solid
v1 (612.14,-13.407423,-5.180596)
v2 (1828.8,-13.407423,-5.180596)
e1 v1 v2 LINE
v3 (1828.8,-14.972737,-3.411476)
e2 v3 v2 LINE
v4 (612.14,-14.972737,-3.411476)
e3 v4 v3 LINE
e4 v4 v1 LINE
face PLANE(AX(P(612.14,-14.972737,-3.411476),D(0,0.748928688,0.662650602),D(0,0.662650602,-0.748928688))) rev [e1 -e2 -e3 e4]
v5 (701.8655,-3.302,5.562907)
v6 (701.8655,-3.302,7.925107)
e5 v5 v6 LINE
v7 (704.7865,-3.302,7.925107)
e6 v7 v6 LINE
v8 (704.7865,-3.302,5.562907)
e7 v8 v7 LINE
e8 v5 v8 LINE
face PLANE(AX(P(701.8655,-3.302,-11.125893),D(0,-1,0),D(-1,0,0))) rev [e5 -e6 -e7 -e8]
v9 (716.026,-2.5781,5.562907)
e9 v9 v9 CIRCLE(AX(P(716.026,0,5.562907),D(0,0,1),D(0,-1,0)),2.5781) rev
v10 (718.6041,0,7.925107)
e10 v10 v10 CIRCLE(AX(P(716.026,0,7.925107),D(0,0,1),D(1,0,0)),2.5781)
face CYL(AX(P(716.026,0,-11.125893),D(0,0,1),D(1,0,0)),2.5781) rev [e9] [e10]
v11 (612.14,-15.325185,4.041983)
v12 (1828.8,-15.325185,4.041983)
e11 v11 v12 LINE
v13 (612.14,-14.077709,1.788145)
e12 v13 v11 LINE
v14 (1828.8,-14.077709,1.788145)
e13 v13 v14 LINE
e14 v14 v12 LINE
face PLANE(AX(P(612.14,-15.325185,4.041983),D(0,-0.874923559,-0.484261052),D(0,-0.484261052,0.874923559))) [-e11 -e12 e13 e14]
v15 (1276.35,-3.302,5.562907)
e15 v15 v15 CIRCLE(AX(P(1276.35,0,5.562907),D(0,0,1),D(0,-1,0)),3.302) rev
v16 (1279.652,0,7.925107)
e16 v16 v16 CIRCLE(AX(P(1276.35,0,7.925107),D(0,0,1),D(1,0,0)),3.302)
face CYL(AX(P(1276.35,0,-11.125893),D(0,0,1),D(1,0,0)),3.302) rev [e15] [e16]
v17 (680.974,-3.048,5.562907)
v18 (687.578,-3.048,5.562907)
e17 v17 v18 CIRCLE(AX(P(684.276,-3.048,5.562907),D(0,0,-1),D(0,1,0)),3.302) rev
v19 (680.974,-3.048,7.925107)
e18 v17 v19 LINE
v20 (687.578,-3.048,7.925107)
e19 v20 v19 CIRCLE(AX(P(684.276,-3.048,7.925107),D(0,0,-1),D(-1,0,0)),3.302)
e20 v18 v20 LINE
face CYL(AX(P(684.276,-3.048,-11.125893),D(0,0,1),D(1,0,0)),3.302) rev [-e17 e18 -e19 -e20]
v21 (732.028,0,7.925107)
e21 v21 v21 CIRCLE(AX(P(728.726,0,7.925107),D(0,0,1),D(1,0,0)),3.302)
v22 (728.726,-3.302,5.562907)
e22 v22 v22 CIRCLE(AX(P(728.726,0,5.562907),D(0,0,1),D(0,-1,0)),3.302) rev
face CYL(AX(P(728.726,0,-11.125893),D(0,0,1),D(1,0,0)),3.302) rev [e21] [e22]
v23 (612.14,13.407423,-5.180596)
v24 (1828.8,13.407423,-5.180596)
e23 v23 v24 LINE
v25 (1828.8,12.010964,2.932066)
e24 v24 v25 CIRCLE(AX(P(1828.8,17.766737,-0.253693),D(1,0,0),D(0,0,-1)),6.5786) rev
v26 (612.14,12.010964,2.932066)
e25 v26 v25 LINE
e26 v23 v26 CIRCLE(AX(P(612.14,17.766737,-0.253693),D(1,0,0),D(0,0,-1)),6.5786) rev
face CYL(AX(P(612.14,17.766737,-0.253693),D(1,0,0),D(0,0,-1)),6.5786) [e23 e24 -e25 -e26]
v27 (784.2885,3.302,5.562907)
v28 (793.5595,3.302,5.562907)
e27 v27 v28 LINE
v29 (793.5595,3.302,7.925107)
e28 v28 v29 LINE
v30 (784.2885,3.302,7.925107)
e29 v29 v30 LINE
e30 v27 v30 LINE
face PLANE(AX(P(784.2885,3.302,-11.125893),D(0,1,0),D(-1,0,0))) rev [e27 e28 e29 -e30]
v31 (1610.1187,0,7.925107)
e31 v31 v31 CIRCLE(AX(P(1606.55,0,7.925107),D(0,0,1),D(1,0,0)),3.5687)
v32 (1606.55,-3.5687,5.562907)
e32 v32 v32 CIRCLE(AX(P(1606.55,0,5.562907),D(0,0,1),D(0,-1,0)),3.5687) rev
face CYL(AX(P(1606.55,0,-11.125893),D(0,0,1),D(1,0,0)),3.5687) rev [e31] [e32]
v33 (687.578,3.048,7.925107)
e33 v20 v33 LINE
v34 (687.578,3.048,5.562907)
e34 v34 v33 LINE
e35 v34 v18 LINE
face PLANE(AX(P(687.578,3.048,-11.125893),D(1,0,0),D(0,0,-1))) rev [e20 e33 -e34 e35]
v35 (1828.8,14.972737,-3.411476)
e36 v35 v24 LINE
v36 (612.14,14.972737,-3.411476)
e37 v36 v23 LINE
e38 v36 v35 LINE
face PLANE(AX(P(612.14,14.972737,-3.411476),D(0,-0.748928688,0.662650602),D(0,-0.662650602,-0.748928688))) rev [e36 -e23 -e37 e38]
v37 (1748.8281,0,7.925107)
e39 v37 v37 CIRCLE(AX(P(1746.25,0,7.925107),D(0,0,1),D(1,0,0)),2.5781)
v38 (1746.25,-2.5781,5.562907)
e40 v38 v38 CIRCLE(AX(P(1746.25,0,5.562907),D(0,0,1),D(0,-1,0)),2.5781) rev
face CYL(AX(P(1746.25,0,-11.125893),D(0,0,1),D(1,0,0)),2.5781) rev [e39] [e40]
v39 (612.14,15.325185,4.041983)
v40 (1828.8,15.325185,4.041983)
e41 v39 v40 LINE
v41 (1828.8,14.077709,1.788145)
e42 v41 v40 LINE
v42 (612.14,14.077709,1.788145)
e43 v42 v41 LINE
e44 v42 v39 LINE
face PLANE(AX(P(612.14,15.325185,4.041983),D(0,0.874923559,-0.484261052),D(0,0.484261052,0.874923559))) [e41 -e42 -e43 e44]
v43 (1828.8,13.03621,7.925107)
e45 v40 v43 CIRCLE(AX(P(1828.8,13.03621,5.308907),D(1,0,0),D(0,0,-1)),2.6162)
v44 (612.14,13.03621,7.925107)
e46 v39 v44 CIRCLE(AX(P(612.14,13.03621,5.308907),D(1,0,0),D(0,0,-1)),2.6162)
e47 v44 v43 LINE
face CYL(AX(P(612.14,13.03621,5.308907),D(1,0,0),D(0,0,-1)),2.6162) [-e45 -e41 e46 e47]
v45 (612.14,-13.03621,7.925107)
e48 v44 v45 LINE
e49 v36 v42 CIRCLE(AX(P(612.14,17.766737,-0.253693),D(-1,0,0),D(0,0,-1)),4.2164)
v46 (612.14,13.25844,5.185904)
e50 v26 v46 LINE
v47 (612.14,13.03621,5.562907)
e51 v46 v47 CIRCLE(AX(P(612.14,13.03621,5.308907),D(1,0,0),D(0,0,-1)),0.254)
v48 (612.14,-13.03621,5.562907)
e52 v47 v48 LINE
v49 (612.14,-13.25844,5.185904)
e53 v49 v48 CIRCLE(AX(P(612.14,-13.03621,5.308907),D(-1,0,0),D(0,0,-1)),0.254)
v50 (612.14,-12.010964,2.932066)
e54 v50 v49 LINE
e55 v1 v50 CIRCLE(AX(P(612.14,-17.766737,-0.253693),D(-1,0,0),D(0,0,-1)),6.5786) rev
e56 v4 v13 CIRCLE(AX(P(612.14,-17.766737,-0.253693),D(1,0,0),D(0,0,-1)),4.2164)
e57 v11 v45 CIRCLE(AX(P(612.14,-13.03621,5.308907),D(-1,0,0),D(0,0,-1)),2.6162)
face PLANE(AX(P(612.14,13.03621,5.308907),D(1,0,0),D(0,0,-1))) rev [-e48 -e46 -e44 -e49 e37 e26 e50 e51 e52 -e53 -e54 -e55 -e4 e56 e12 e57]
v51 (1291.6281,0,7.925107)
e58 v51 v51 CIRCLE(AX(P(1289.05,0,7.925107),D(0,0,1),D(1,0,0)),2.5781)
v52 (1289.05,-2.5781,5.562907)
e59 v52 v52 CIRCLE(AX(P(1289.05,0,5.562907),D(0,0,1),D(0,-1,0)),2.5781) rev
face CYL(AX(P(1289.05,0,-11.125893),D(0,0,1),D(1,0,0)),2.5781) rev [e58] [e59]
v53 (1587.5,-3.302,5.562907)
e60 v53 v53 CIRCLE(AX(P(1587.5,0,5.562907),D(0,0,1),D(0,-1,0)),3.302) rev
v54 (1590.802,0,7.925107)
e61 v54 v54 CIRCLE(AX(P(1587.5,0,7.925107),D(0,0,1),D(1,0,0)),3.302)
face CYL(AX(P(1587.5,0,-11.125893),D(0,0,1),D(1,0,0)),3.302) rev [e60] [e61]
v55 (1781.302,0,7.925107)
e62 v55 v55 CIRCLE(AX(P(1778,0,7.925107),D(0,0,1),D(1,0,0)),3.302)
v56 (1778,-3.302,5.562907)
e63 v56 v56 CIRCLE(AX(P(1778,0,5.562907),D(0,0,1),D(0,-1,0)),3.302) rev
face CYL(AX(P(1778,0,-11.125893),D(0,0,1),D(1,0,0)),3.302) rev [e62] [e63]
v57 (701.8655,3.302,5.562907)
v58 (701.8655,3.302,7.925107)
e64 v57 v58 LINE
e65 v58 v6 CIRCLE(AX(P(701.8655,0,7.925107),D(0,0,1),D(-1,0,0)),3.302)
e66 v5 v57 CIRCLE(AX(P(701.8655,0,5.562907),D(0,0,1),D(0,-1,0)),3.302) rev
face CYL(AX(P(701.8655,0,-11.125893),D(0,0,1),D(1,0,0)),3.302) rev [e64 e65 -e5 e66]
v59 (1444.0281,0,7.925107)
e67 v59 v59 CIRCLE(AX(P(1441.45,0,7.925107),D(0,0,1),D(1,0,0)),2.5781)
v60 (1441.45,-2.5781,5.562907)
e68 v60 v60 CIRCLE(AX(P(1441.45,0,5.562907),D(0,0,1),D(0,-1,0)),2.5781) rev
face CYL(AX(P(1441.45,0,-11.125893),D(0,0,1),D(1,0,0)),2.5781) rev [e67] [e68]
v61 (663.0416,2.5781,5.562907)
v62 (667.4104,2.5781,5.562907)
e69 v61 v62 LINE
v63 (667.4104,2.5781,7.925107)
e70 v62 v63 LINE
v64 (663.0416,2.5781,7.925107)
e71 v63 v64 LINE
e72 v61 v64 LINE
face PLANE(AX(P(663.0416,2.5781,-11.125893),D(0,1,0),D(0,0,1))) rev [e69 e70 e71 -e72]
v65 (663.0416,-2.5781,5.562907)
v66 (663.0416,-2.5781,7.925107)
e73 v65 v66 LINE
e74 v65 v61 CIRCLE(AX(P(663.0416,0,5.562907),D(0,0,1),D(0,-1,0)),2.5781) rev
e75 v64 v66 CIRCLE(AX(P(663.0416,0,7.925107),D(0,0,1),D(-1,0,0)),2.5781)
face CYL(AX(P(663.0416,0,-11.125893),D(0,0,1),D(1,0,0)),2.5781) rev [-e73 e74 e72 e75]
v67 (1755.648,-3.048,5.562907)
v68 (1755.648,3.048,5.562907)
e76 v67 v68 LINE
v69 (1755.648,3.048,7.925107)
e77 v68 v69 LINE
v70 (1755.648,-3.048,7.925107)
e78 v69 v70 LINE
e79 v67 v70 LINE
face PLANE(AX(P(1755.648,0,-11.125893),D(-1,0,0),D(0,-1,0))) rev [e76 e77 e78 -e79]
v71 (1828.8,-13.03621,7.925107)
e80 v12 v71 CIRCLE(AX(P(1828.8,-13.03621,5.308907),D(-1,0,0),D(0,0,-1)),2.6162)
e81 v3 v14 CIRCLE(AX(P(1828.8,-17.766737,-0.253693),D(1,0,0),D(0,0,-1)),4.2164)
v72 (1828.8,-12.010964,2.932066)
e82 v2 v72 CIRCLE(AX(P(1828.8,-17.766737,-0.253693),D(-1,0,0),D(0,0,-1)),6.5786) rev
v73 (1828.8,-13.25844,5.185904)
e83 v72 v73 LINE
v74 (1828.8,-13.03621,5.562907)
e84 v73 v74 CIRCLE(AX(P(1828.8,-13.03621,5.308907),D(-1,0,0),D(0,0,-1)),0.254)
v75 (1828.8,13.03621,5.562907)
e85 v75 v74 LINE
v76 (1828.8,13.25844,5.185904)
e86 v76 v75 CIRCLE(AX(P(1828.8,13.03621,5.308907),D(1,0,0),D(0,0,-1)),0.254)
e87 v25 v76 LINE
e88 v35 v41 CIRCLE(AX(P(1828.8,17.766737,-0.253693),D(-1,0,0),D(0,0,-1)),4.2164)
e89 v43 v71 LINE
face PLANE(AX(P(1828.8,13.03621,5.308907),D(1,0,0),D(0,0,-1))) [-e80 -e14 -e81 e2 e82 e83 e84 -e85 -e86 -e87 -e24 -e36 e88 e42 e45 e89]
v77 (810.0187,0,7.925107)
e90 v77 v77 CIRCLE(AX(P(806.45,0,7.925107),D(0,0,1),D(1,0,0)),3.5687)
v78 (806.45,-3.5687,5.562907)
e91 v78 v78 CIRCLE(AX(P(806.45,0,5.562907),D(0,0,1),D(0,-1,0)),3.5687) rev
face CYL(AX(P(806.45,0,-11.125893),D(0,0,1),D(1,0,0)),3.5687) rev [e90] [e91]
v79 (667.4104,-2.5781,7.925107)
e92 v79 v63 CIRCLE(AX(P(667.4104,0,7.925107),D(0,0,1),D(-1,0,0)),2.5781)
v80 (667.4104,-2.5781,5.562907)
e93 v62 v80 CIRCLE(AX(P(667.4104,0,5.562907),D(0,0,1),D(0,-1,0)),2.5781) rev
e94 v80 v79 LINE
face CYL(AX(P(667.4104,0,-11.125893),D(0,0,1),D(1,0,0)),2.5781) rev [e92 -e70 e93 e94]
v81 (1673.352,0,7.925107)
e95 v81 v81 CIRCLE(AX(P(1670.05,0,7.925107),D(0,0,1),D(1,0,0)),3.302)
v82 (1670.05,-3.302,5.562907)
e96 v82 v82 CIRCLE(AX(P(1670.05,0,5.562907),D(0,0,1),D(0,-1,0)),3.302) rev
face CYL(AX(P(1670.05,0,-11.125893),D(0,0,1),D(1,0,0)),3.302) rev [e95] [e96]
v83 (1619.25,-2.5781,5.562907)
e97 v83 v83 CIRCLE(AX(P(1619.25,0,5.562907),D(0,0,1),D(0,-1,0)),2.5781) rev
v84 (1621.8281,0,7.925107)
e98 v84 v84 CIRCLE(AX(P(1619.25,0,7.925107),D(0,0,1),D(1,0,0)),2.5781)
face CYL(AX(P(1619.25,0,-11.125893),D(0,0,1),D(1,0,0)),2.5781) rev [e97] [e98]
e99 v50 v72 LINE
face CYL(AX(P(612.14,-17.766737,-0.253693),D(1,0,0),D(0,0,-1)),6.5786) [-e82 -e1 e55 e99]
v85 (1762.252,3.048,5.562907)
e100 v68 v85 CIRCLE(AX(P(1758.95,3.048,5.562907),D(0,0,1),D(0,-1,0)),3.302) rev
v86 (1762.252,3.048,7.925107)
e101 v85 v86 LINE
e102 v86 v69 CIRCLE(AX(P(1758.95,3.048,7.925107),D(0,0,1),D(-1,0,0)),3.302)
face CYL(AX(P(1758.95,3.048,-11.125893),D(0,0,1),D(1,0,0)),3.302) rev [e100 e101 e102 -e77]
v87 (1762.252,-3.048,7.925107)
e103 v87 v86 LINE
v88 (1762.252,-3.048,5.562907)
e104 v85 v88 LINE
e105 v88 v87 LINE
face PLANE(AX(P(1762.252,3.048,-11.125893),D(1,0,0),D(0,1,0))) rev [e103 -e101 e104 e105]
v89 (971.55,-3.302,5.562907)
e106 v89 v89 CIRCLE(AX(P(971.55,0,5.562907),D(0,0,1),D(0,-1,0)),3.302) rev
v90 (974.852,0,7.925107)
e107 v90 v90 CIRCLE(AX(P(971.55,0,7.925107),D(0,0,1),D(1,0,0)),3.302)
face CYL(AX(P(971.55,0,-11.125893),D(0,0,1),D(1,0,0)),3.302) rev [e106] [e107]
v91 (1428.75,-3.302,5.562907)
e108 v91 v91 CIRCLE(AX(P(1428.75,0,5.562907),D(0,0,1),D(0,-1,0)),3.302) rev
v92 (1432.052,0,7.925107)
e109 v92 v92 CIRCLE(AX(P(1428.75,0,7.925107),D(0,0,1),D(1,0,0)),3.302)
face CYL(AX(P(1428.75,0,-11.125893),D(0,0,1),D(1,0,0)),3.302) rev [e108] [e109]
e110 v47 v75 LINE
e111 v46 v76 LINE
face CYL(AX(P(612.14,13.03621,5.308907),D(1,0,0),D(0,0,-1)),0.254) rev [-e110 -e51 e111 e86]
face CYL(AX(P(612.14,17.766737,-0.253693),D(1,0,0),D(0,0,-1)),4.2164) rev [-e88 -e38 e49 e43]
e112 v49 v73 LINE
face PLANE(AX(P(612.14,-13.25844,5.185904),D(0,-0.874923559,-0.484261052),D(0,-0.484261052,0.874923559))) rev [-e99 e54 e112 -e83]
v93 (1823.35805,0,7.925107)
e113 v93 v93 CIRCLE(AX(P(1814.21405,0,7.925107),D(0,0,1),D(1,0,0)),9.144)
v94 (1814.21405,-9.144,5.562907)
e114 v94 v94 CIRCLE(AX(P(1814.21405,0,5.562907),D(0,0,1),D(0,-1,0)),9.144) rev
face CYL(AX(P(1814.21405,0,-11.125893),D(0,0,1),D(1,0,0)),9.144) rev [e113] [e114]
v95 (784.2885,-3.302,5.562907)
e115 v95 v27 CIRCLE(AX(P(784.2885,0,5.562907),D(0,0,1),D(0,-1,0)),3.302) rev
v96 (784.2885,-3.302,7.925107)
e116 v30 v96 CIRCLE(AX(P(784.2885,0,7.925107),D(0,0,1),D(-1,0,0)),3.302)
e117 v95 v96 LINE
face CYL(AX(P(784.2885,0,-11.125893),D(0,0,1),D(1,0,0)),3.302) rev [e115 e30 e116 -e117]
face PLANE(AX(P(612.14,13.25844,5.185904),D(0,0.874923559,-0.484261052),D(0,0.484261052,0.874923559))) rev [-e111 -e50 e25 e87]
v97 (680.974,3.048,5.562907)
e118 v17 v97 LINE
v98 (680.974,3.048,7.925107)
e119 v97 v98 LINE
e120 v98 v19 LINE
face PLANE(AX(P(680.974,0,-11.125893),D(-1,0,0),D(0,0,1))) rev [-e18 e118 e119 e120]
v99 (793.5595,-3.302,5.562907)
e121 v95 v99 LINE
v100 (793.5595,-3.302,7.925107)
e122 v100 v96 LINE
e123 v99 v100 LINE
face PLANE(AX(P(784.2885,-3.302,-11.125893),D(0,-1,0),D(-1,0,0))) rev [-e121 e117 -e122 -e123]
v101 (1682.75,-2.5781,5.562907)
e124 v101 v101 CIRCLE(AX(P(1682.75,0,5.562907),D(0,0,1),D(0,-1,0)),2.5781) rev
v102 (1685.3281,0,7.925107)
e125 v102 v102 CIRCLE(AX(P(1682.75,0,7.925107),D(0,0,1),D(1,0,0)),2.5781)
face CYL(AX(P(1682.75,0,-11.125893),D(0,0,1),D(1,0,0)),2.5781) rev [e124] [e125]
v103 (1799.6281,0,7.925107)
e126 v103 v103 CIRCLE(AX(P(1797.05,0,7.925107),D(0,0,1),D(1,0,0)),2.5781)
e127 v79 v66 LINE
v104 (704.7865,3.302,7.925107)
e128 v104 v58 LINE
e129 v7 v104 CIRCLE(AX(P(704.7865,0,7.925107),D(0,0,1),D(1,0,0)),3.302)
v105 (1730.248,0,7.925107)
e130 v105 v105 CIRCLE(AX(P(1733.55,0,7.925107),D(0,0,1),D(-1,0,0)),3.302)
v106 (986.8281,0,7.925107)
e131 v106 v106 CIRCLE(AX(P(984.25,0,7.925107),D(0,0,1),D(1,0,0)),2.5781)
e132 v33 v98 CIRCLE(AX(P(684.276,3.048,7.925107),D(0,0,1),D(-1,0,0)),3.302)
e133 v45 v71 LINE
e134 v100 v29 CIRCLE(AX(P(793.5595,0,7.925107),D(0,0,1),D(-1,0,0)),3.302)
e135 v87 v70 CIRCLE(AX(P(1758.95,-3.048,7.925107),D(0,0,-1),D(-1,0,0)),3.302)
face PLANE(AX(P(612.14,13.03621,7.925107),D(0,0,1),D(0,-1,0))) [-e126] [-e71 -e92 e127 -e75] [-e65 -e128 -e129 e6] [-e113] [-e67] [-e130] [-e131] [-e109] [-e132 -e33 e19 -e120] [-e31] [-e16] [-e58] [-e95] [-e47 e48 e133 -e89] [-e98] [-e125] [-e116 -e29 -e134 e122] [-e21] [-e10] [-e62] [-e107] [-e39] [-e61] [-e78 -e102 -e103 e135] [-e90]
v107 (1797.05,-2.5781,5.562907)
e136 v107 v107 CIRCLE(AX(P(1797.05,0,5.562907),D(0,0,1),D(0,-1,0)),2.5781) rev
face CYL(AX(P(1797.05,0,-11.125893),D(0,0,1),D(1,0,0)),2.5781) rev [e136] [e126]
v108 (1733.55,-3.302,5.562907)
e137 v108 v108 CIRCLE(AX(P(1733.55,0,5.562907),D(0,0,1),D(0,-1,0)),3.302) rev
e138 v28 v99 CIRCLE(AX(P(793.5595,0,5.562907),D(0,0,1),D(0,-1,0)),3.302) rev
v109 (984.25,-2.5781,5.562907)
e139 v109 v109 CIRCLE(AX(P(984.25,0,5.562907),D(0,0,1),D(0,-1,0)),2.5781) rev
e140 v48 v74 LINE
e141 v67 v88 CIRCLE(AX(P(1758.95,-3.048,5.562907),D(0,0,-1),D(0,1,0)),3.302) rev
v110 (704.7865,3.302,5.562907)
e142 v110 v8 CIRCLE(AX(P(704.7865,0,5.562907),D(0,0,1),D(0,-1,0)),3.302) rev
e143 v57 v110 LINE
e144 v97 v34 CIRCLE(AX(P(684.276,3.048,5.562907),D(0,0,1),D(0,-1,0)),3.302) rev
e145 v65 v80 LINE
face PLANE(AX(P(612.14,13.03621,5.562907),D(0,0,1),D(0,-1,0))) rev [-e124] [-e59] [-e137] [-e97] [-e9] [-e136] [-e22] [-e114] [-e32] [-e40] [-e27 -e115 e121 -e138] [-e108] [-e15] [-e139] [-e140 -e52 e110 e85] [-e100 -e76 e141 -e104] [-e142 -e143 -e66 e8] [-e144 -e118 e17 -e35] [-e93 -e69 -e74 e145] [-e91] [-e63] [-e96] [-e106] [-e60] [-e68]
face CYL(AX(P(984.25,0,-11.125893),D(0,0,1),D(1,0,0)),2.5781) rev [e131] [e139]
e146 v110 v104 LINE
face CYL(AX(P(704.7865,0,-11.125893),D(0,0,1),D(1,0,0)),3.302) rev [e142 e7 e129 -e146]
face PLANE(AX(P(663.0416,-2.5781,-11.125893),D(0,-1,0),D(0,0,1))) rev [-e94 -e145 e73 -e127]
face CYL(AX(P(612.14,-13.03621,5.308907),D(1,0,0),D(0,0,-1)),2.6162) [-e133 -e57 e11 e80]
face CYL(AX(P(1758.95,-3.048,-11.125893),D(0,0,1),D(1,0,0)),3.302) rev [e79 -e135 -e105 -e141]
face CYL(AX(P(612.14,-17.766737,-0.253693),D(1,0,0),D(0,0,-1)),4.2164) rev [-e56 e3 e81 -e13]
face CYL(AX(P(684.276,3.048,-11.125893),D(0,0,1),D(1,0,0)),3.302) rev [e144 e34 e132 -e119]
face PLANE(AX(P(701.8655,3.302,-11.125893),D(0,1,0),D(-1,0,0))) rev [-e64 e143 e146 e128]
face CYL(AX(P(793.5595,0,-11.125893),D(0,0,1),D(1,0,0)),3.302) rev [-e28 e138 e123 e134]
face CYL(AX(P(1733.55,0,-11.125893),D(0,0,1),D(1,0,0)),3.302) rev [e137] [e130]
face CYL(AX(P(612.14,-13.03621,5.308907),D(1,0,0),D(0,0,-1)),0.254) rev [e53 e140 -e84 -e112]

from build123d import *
from build123d.topology import SkipClean

# Parameters (mm, degrees)
EXTRUDE_THIN1_START     = -609.6
EXTRUDE_THIN1_DEPTH     = 1219.2
EXTRUDE_THIN2_DEPTH     = 1212.85
EXTRUDE_THIN5_START     = -1216.66
EXTRUDE_THIN5_DEPTH     = 1216.66
CUT_EXTRUDE1_DEPTH      = 1830.230661576
CUT_EXTRUDE1_DEPTH_BACK = 1830.230661576
SKETCH6_W               = 12.7
SKETCH6_H               = 12.7
SKETCH9_W               = 2.3622
SKETCH9_H               = 13.3858
EXTRUDE1_DEPTH          = 25.4
FILLET1_R               = 1.016
FILLET2_R               = 3.3782
CUT_EXTRUDE2_DEPTH      = 2.3622
SKETCH2_R               = 2.5781
SKETCH2_R_2             = 3.302
CUT_EXTRUDE12_DEPTH     = 2.3622
SKETCH22_R              = 2.5781
SKETCH22_R_2            = 3.302
SKETCH22_R_3            = 3.5687
CUT_EXTRUDE13_DEPTH     = 2.3622
SKETCH23_R              = 2.5781
SKETCH23_R_2            = 3.302
CUT_EXTRUDE14_DEPTH     = 2.3622
SKETCH24_R              = 2.5781
SKETCH24_R_2            = 3.302
CUT_EXTRUDE15_DEPTH     = 2.3622
SKETCH25_R              = 2.5781
SKETCH25_R_2            = 3.302
CUT_EXTRUDE16_DEPTH     = 2.3622
SKETCH27_R              = 3.5687
CUT_E_DEPTH             = 2.3622
SKETCH28_R              = 3.302
CUT_F_DEPTH             = 2.3622
SKETCH29_R              = 2.5781
CUT_EXTRUDE18_DEPTH     = 2.3622
CUT_H_DEPTH             = 2.3622
CUT_J_DEPTH             = 2.3622
SKETCH32_R              = 2.5781
SKETCH32_R_2            = 3.302
CUT_EXTRUDE21_DEPTH     = 2.3622
SKETCH210_R             = 2.5781
SKETCH210_R_2           = 3.302
CUT_EXTRUDE19_DEPTH     = 2.3622
SKETCH211_R             = 2.5781
SKETCH211_R_2           = 3.302
CUT_EXTRUDE110_DEPTH    = 2.3622
SKETCH212_R             = 2.5781
SKETCH212_R_2           = 3.302
CUT_EXTRUDE111_DEPTH    = 2.3622
SKETCH214_R             = 2.5781
SKETCH214_R_2           = 3.302
CUT_EXTRUDE113_DEPTH    = 2.3622
SKETCH215_R             = 3.302
CUT_EXTRUDE114_DEPTH    = 2.3622
CUT_R_DEPTH             = 2.3622
LPATTERN1_COUNT         = 23
LPATTERN1_PITCH         = 25.4
EXTRUDE2_DEPTH          = 12.7
EXTRUDE2_DEPTH_BACK     = 565.15
SKETCH218_W             = 11.43
SKETCH218_H             = 1.27
LPATTERN2_COUNT         = 23
LPATTERN2_PITCH         = 25.4
EXTRUDE3_DEPTH          = 12.7
EXTRUDE3_DEPTH_BACK     = 568.96
SKETCH220_W             = 9.245599771
SKETCH220_H             = 1.27


# Read off the part's stored shape, not the designer's step: Extrude-Thin1, Extrude-Thin5
with BuildPart() as part:
    # Extrude-Thin1 outline → Extrude-Thin1 (new body)
    with BuildSketch(Plane(origin=(0, 0, 0), x_dir=(0, 0, -1), z_dir=(1, 0, 0)).offset(EXTRUDE_THIN1_START)):
        with BuildLine():
            ThreePointArc((5.752462483, 35.334775085), (-0.647910774, 38.071449668), (-6.469678085, 34.255536805))
            Line((-6.469678085, 34.255536805), (-4.394919251, 33.126216382))
            ThreePointArc((-4.394919251, 33.126216382), (-0.440132491, 35.718405464), (3.907707273, 33.85935411))
            ThreePointArc((3.907707273, 33.85935411), (4.993998236, 32.994951487), (6.347544809, 32.686517335))
            Line((6.347544809, 32.686517335), (7.175193262, 32.686517335))
            ThreePointArc((7.175193262, 32.686517335), (8.297725277, 32.22154935), (8.762693262, 31.099017335))
            Line((8.762693262, 31.099017335), (8.762693262, 0))
            Line((8.762693262, 0), (11.124893262, 0))
            Line((11.124893262, 0), (11.124893262, 31.099017335))
            ThreePointArc((11.124893262, 31.099017335), (9.968052916, 33.891876989), (7.175193262, 35.048717335))
            Line((7.175193262, 35.048717335), (6.347544809, 35.048717335))
            ThreePointArc((6.347544809, 35.048717335), (6.017411498, 35.123945177), (5.752462483, 35.334775085))
        make_face()
    extrude(amount=EXTRUDE_THIN1_DEPTH)

    # Sketch6 → Cut-Extrude1 (cut, two sides: drawn at the far end of the back side and taken through both)
    with BuildSketch(Plane.XY.offset(-CUT_EXTRUDE1_DEPTH_BACK)):
        with Locations((-603.25, 31.75)):
            Rectangle(SKETCH6_W, SKETCH6_H)
    extrude(amount=CUT_EXTRUDE1_DEPTH + CUT_EXTRUDE1_DEPTH_BACK, mode=Mode.SUBTRACT)

    # Sketch9 → Extrude1 (add)
    with BuildSketch(Plane(origin=(0, 25.4, 0), x_dir=(-1, 0, 0), z_dir=(0, 1, 0))):
        with Locations((608.4189, -2.069793262)):
            Rectangle(SKETCH9_W, SKETCH9_H)
    extrude(amount=-EXTRUDE1_DEPTH)

    # Fillet1
    fillet1_edges = [part.edges().sort_by_distance(p)[0] for p in [
        (-607.2378, 12.7, -8.762693262),
    ]]
    fillet(fillet1_edges, radius=FILLET1_R)

    # Fillet2
    fillet2_edges = [part.edges().sort_by_distance(p)[0] for p in [
        (-609.6, 12.7, -11.124893262),
    ]]
    fillet(fillet2_edges, radius=FILLET2_R)

    # Sketch32 → Cut-Extrude21 (cut)
    with BuildSketch(Plane.XY.offset(-8.762693262)):
        with Locations((596.9, 0)):
            Circle(SKETCH32_R)
        with Locations((577.85, 0)):
            Circle(SKETCH32_R_2)
        with Locations((520.7, 0)):
            Circle(SKETCH32_R_2)
        with Locations((533.4, 0)):
            Circle(SKETCH32_R)
        with BuildLine():
            Line((549.148, 0), (561.848, 0))
            ThreePointArc((561.848, 0), (560.880866591, 2.334866591), (558.546, 3.302))
            Line((558.546, 3.302), (552.45, 3.302))
            ThreePointArc((552.45, 3.302), (550.115133409, 2.334866591), (549.148, 0))
        make_face()
    extrude(amount=-CUT_EXTRUDE21_DEPTH, mode=Mode.SUBTRACT)

    # Sketch210 → Cut-Extrude19 (cut)
    with BuildSketch(Plane(origin=(-677.249248887, 14.903736783, -8.762693262), x_dir=(1, 0, 0), z_dir=(0, 0, 1))):
        with Locations((1051.899248887, -14.903736783)):
            Circle(SKETCH210_R)
        with Locations((1039.199248887, -14.903736783)):
            Circle(SKETCH210_R_2)
    extrude(amount=-CUT_EXTRUDE19_DEPTH, mode=Mode.SUBTRACT)

    # Sketch211 → Cut-Extrude110 (cut)
    with BuildSketch(Plane(origin=(-447.985498291, 15.81613418, -8.762693262), x_dir=(1, 0, 0), z_dir=(0, 0, 1))):
        with Locations((460.685498291, -15.81613418)):
            Circle(SKETCH211_R)
        with Locations((447.985498291, -15.81613418)):
            Circle(SKETCH211_R_2)
    extrude(amount=-CUT_EXTRUDE110_DEPTH, mode=Mode.SUBTRACT)

    # Sketch212 → Cut-Extrude111 (cut)
    with BuildSketch(Plane(origin=(250.194594693, 14.477181682, -8.762693262), x_dir=(1, 0, 0), z_dir=(0, 0, 1))):
        with Locations((-599.444594693, -14.477181682)):
            Circle(SKETCH212_R)
        with Locations((-612.144594693, -14.477181682)):
            Circle(SKETCH212_R_2)
    extrude(amount=-CUT_EXTRUDE111_DEPTH, mode=Mode.SUBTRACT)

    # Sketch214 → Cut-Extrude113 (cut)
    with BuildSketch(Plane(origin=(529.798432462, 18.139402612, -8.762693262), x_dir=(1, 0, 0), z_dir=(0, 0, 1))):
        with Locations((-1066.500432462, -18.139402612)):
            Circle(SKETCH214_R)
        with Locations((-1079.200432462, -18.139402612)):
            Circle(SKETCH214_R_2)
        with BuildLine():
            Line((-1044.148432462, -18.139402612), (-1056.848432462, -18.139402612))
            ThreePointArc((-1056.848432462, -18.139402612), (-1055.881299054, -15.80453602), (-1053.546432462, -14.837402612))
            Line((-1053.546432462, -14.837402612), (-1047.450432462, -14.837402612))
            ThreePointArc((-1047.450432462, -14.837402612), (-1045.115565871, -15.80453602), (-1044.148432462, -18.139402612))
        make_face()
    extrude(amount=-CUT_EXTRUDE113_DEPTH, mode=Mode.SUBTRACT)

    # Sketch215 → Cut-Extrude114 (cut)
    with BuildSketch(Plane(origin=(674.3557152, 11.320285871, -8.762693262), x_dir=(1, 0, 0), z_dir=(0, 0, 1))):
        with Locations((-1252.2057152, -11.320285871)):
            Circle(SKETCH215_R)
    extrude(amount=-CUT_EXTRUDE114_DEPTH, mode=Mode.SUBTRACT)

    # Sketch216 → Cut R (cut)
    with BuildSketch(Plane.XY.offset(-8.762693262)):
        with BuildLine():
            Line((-601.6625, 0), (-592.1375, 0))
            ThreePointArc((-592.1375, 0), (-592.892608007, 1.822991993), (-594.7156, 2.5781))
            Line((-594.7156, 2.5781), (-599.0844, 2.5781))
            ThreePointArc((-599.0844, 2.5781), (-600.907391993, 1.822991993), (-601.6625, 0))
        make_face()
    extrude(amount=-CUT_R_DEPTH, mode=Mode.SUBTRACT)

    # Mirror1 3: part across plane


with BuildPart() as body_2:
    # Sketch4 → Extrude-Thin2 (new body)
    with BuildSketch(Plane(origin=(1219.2, 0, 0), x_dir=(0, 0, -1), z_dir=(1, 0, 0))):
        with BuildLine():
            ThreePointArc((3.54024831, 19.789205828), (0.77024158, 21.457292879), (-2.36668079, 20.672965307))
            ThreePointArc((-2.36668079, 20.672965307), (-3.091811244, 20.294053258), (-3.898522237, 20.157649845))
            ThreePointArc((-3.898522237, 20.157649845), (-5.766174756, 20.914093138), (-6.542172842, 22.773705828))
            Line((-6.542172842, 22.773705828), (-6.542172842, 25.161305828))
            ThreePointArc((-6.542172842, 25.161305828), (-5.766174756, 27.020918518), (-3.898522237, 27.77736181))
            ThreePointArc((-3.898522237, 27.77736181), (-3.659975019, 27.729624759), (-3.455361804, 27.598030559))
            ThreePointArc((-3.455361804, 27.598030559), (-0.023095262, 26.226172038), (3.414460302, 27.584723163))
            ThreePointArc((3.414460302, 27.584723163), (6.244879756, 28.080225918), (7.822893148, 25.678836527))
            Line((7.822893148, 25.678836527), (7.822893148, 11.408756936))
            ThreePointArc((7.822893148, 11.408756936), (7.431553352, 9.948256936), (6.362393148, 8.879096732))
            Line((6.362393148, 8.879096732), (3.123893148, 7.009347885))
            ThreePointArc((3.123893148, 7.009347885), (2.84498179, 6.730436527), (2.742893148, 6.349436527))
            Line((2.742893148, 6.349436527), (2.742893148, 0))
            Line((2.742893148, 0), (0.583893148, 0))
            Line((0.583893148, 0), (0.583893148, 6.349436527))
            ThreePointArc((0.583893148, 6.349436527), (0.975232943, 7.809936527), (2.044393148, 8.879096732))
            Line((2.044393148, 8.879096732), (5.282893148, 10.748845578))
            ThreePointArc((5.282893148, 10.748845578), (5.561804505, 11.027756936), (5.663893148, 11.408756936))
            Line((5.663893148, 11.408756936), (5.663893148, 25.678836527))
            ThreePointArc((5.663893148, 25.678836527), (5.388123817, 26.098496809), (4.893487408, 26.011904095))
            ThreePointArc((4.893487408, 26.011904095), (0.412345154, 24.079826794), (-4.266408016, 25.466487303))
            ThreePointArc((-4.266408016, 25.466487303), (-4.352985021, 25.324684037), (-4.383172842, 25.161305828))
            Line((-4.383172842, 25.161305828), (-4.383172842, 22.773705828))
            ThreePointArc((-4.383172842, 22.773705828), (-4.247561526, 22.448724969), (-3.921175649, 22.316530996))
            ThreePointArc((-3.921175649, 22.316530996), (-3.780197029, 22.340368486), (-3.653475202, 22.406586125))
            ThreePointArc((-3.653475202, 22.406586125), (1.089702598, 23.592527212), (5.278086268, 21.070299201))
            Line((5.278086268, 21.070299201), (3.54024831, 19.789205828))
        make_face()
    extrude(amount=-EXTRUDE_THIN2_DEPTH)

    # Mirror1: body 2 across plane


with BuildPart() as body_3:
    # Extrude-Thin5 outline → Extrude-Thin5 (new body)
    with BuildSketch(Plane(origin=(1828.8, 0, 0), x_dir=(0, 0, -1), z_dir=(1, 0, 0)).offset(EXTRUDE_THIN5_START)):
        with BuildLine():
            Line((-7.925106738, 0), (-5.562906738, 0))
            Line((-5.562906738, 0), (-5.562906738, 13.036209579))
            ThreePointArc((-5.562906738, 13.036209579), (-5.437890097, 13.255022954), (-5.185904431, 13.258440163))
            Line((-5.185904431, 13.258440163), (-2.932066495, 12.010964405))
            ThreePointArc((-2.932066495, 12.010964405), (1.369676528, 11.28348431), (5.180595526, 13.407423274))
            Line((5.180595526, 13.407423274), (3.41147618, 14.972736527))
            ThreePointArc((3.41147618, 14.972736527), (0.968956668, 13.611447462), (-1.788145038, 14.077708835))
            Line((-1.788145038, 14.077708835), (-4.041982973, 15.325184593))
            ThreePointArc((-4.041982973, 15.325184593), (-6.637435339, 15.28998734), (-7.925106738, 13.036209579))
            Line((-7.925106738, 13.036209579), (-7.925106738, 0))
        make_face()
    extrude(amount=EXTRUDE_THIN5_DEPTH)

    # Sketch10 → Cut-Extrude2 (cut)
    with BuildSketch(Plane.XY.offset(7.925106738)):
        with BuildLine():
            Line((1805.07005, 0), (1823.35805, 0))
            ThreePointArc((1823.35805, 0), (1814.21405, 9.144), (1805.07005, 0))
        make_face()
        with BuildLine():
            Line((1799.6281, 0), (1794.4719, 0))
            ThreePointArc((1794.4719, 0), (1797.05, 2.5781), (1799.6281, 0))
        make_face()
        with BuildLine():
            Line((1781.302, 0), (1774.698, 0))
            ThreePointArc((1774.698, 0), (1778, 3.302), (1781.302, 0))
        make_face()
        with BuildLine():
            Line((1762.252, 3.048), (1762.252, 0))
            Line((1762.252, 0), (1755.648, 0))
            Line((1755.648, 0), (1755.648, 3.048))
            ThreePointArc((1755.648, 3.048), (1758.95, 6.35), (1762.252, 3.048))
        make_face()
        with BuildLine():
            Line((1748.8281, 0), (1743.6719, 0))
            ThreePointArc((1743.6719, 0), (1746.25, 2.5781), (1748.8281, 0))
        make_face()
        with BuildLine():
            Line((1736.852, 0), (1730.248, 0))
            ThreePointArc((1730.248, 0), (1733.55, 3.302), (1736.852, 0))
        make_face()
    extrude(amount=-CUT_EXTRUDE2_DEPTH, mode=Mode.SUBTRACT)

    # Sketch2 → Cut-Extrude12 (cut)
    with BuildSketch(Plane(origin=(-2141.845428582, 6.157941778, 7.925106738), x_dir=(1, 0, 0), z_dir=(0, 0, 1))):
        with Locations((3824.595428582, -6.157941778)):
            Circle(SKETCH2_R)
        with Locations((3811.895428582, -6.157941778)):
            Circle(SKETCH2_R_2)
    extrude(amount=-CUT_EXTRUDE12_DEPTH, mode=Mode.SUBTRACT)

    # Sketch22 → Cut-Extrude13 (cut)
    with BuildSketch(Plane(origin=(-2143.135428603, 5.657950018, 7.925106738), x_dir=(1, 0, 0), z_dir=(0, 0, 1))):
        with Locations((3762.385428603, -5.657950018)):
            Circle(SKETCH22_R)
        with Locations((3730.635428603, -5.657950018)):
            Circle(SKETCH22_R_2)
        with Locations((3749.685428603, -5.657950018)):
            Circle(SKETCH22_R_3)
    extrude(amount=-CUT_EXTRUDE13_DEPTH, mode=Mode.SUBTRACT)

    # Sketch23 → Cut-Extrude14 (cut)
    with BuildSketch(Plane(origin=(-2022.429166167, 5.760053708, 7.925106738), x_dir=(1, 0, 0), z_dir=(0, 0, 1))):
        with Locations((3463.879166167, -5.760053708)):
            Circle(SKETCH23_R)
        with Locations((3451.179166167, -5.760053708)):
            Circle(SKETCH23_R_2)
    extrude(amount=-CUT_EXTRUDE14_DEPTH, mode=Mode.SUBTRACT)

    # Sketch24 → Cut-Extrude15 (cut)
    with BuildSketch(Plane(origin=(-1862.330020924, 7.905664942, 7.925106738), x_dir=(1, 0, 0), z_dir=(0, 0, 1))):
        with Locations((3151.380020924, -7.905664942)):
            Circle(SKETCH24_R)
        with Locations((3138.680020924, -7.905664942)):
            Circle(SKETCH24_R_2)
    extrude(amount=-CUT_EXTRUDE15_DEPTH, mode=Mode.SUBTRACT)

    # Sketch25 → Cut-Extrude16 (cut)
    with BuildSketch(Plane(origin=(-1718.369763818, 7.737387679, 7.925106738), x_dir=(1, 0, 0), z_dir=(0, 0, 1))):
        with Locations((2702.619763818, -7.737387679)):
            Circle(SKETCH25_R)
        with Locations((2689.919763818, -7.737387679)):
            Circle(SKETCH25_R_2)
    extrude(amount=-CUT_EXTRUDE16_DEPTH, mode=Mode.SUBTRACT)

    # Sketch27 → Cut E (cut)
    with BuildSketch(Plane.XY.offset(7.925106738)):
        with Locations((806.45, 0)):
            Circle(SKETCH27_R)
        with BuildLine():
            Line((796.8615, 0), (780.9865, 0))
            ThreePointArc((780.9865, 0), (781.953633409, 2.334866591), (784.2885, 3.302))
            Line((784.2885, 3.302), (793.5595, 3.302))
            ThreePointArc((793.5595, 3.302), (795.894366591, 2.334866591), (796.8615, 0))
        make_face()
    extrude(amount=-CUT_E_DEPTH, mode=Mode.SUBTRACT)

    # Sketch28 → Cut F (cut)
    with BuildSketch(Plane.XY.offset(7.925106738)):
        with Locations((728.726, 0)):
            Circle(SKETCH28_R)
    extrude(amount=-CUT_F_DEPTH, mode=Mode.SUBTRACT)

    # Sketch29 → Cut-Extrude18 (cut)
    with BuildSketch(Plane(origin=(-866.129297637, 5.417355799, 7.925106738), x_dir=(1, 0, 0), z_dir=(0, 0, 1))):
        with Locations((1582.155297637, -5.417355799)):
            Circle(SKETCH29_R)
        with BuildLine():
            Line((1574.217797637, -5.417355799), (1564.692797637, -5.417355799))
            ThreePointArc((1564.692797637, -5.417355799), (1565.659931046, -3.082489207), (1567.994797637, -2.115355799))
            Line((1567.994797637, -2.115355799), (1570.915797637, -2.115355799))
            ThreePointArc((1570.915797637, -2.115355799), (1573.250664228, -3.082489207), (1574.217797637, -5.417355799))
        make_face()
    extrude(amount=-CUT_EXTRUDE18_DEPTH, mode=Mode.SUBTRACT)

    # Sketch30 → Cut H (cut)
    with BuildSketch(Plane.XY.offset(7.925106738)):
        with BuildLine():
            Line((680.974, 0), (680.974, 3.048))
            ThreePointArc((680.974, 3.048), (684.276, 6.35), (687.578, 3.048))
            Line((687.578, 3.048), (687.578, 0))
            Line((687.578, 0), (680.974, 0))
        make_face()
    extrude(amount=-CUT_H_DEPTH, mode=Mode.SUBTRACT)

    # Sketch31 → Cut J (cut)
    with BuildSketch(Plane.XY.offset(7.925106738)):
        with BuildLine():
            Line((669.9885, 0), (660.4635, 0))
            ThreePointArc((660.4635, 0), (661.218608007, 1.822991993), (663.0416, 2.5781))
            Line((663.0416, 2.5781), (667.4104, 2.5781))
            ThreePointArc((667.4104, 2.5781), (669.233391993, 1.822991993), (669.9885, 0))
        make_face()
    extrude(amount=-CUT_J_DEPTH, mode=Mode.SUBTRACT)

    # Mirror1 2: body 3 across plane


with BuildPart() as body_2_1:
    add(body_2.part)
    add(body_2.part.mirror(Plane.ZX))


with BuildPart() as body_3_1:
    with SkipClean():  # the faces are left unmerged after this step: merging them gives an invalid solid
        add(body_3.part)
        add(body_3.part.mirror(Plane.ZX))


with BuildPart() as part_1:
    with SkipClean():  # the faces are left unmerged after this step: merging them gives an invalid solid
        add(part.part)
        add(part.part.mirror(Plane.ZX))


with BuildPart() as body_4:
    # Sketch217 → Revolve1 (revolve)
    with BuildSketch(Plane(origin=(584.2, 0, 0), x_dir=(0, 0, -1), z_dir=(1, 0, 0))):
        with BuildLine():
            Line((0, 35.7378), (0, 26.22652483))
            ThreePointArc((0, 26.22652483), (4.755637585, 30.982162415), (0, 35.7378))
        make_face()
    revolve(axis=Axis((584.2, 36.603094088, 0), (0, -1, 0)))


with BuildPart() as lpattern1_1:
    # LPattern1: pattern copy
    add(body_4.part.moved(Location(Vector(-1, 0, 0) * (1 * LPATTERN1_PITCH))))


with BuildPart() as lpattern1_2:
    # LPattern1: pattern copy
    add(body_4.part.moved(Location(Vector(-1, 0, 0) * (2 * LPATTERN1_PITCH))))


with BuildPart() as lpattern1_3:
    # LPattern1: pattern copy
    add(body_4.part.moved(Location(Vector(-1, 0, 0) * (3 * LPATTERN1_PITCH))))


with BuildPart() as lpattern1_4:
    # LPattern1: pattern copy
    add(body_4.part.moved(Location(Vector(-1, 0, 0) * (4 * LPATTERN1_PITCH))))


with BuildPart() as lpattern1_5:
    # LPattern1: pattern copy
    add(body_4.part.moved(Location(Vector(-1, 0, 0) * (5 * LPATTERN1_PITCH))))


with BuildPart() as lpattern1_6:
    # LPattern1: pattern copy
    add(body_4.part.moved(Location(Vector(-1, 0, 0) * (6 * LPATTERN1_PITCH))))


with BuildPart() as lpattern1_7:
    # LPattern1: pattern copy
    add(body_4.part.moved(Location(Vector(-1, 0, 0) * (7 * LPATTERN1_PITCH))))


with BuildPart() as lpattern1_8:
    # LPattern1: pattern copy
    add(body_4.part.moved(Location(Vector(-1, 0, 0) * (8 * LPATTERN1_PITCH))))


with BuildPart() as lpattern1_9:
    # LPattern1: pattern copy
    add(body_4.part.moved(Location(Vector(-1, 0, 0) * (9 * LPATTERN1_PITCH))))


with BuildPart() as lpattern1_10:
    # LPattern1: pattern copy
    add(body_4.part.moved(Location(Vector(-1, 0, 0) * (10 * LPATTERN1_PITCH))))


with BuildPart() as lpattern1_11:
    # LPattern1: pattern copy
    add(body_4.part.moved(Location(Vector(-1, 0, 0) * (11 * LPATTERN1_PITCH))))


with BuildPart() as lpattern1_12:
    # LPattern1: pattern copy
    add(body_4.part.moved(Location(Vector(-1, 0, 0) * (12 * LPATTERN1_PITCH))))


with BuildPart() as lpattern1_13:
    # LPattern1: pattern copy
    add(body_4.part.moved(Location(Vector(-1, 0, 0) * (13 * LPATTERN1_PITCH))))


with BuildPart() as lpattern1_14:
    # LPattern1: pattern copy
    add(body_4.part.moved(Location(Vector(-1, 0, 0) * (14 * LPATTERN1_PITCH))))


with BuildPart() as lpattern1_15:
    # LPattern1: pattern copy
    add(body_4.part.moved(Location(Vector(-1, 0, 0) * (15 * LPATTERN1_PITCH))))


with BuildPart() as lpattern1_16:
    # LPattern1: pattern copy
    add(body_4.part.moved(Location(Vector(-1, 0, 0) * (16 * LPATTERN1_PITCH))))


with BuildPart() as lpattern1_17:
    # LPattern1: pattern copy
    add(body_4.part.moved(Location(Vector(-1, 0, 0) * (17 * LPATTERN1_PITCH))))


with BuildPart() as lpattern1_18:
    # LPattern1: pattern copy
    add(body_4.part.moved(Location(Vector(-1, 0, 0) * (18 * LPATTERN1_PITCH))))


with BuildPart() as lpattern1_19:
    # LPattern1: pattern copy
    add(body_4.part.moved(Location(Vector(-1, 0, 0) * (19 * LPATTERN1_PITCH))))


with BuildPart() as lpattern1_20:
    # LPattern1: pattern copy
    add(body_4.part.moved(Location(Vector(-1, 0, 0) * (20 * LPATTERN1_PITCH))))


with BuildPart() as lpattern1_21:
    # LPattern1: pattern copy
    add(body_4.part.moved(Location(Vector(-1, 0, 0) * (21 * LPATTERN1_PITCH))))


with BuildPart() as lpattern1_22:
    # LPattern1: pattern copy
    add(body_4.part.moved(Location(Vector(-1, 0, 0) * (22 * LPATTERN1_PITCH))))


with BuildPart() as body_4_1:
    add(body_4.part)

    add(lpattern1_1.part)  # Extrude2 merges LPattern1_1

    add(lpattern1_2.part)  # Extrude2 merges LPattern1_2

    add(lpattern1_3.part)  # Extrude2 merges LPattern1_3

    add(lpattern1_4.part)  # Extrude2 merges LPattern1_4

    add(lpattern1_5.part)  # Extrude2 merges LPattern1_5

    add(lpattern1_6.part)  # Extrude2 merges LPattern1_6

    add(lpattern1_7.part)  # Extrude2 merges LPattern1_7

    add(lpattern1_8.part)  # Extrude2 merges LPattern1_8

    add(lpattern1_9.part)  # Extrude2 merges LPattern1_9

    add(lpattern1_10.part)  # Extrude2 merges LPattern1_10

    add(lpattern1_11.part)  # Extrude2 merges LPattern1_11

    add(lpattern1_12.part)  # Extrude2 merges LPattern1_12

    add(lpattern1_13.part)  # Extrude2 merges LPattern1_13

    add(lpattern1_14.part)  # Extrude2 merges LPattern1_14

    add(lpattern1_15.part)  # Extrude2 merges LPattern1_15

    add(lpattern1_16.part)  # Extrude2 merges LPattern1_16

    add(lpattern1_17.part)  # Extrude2 merges LPattern1_17

    add(lpattern1_18.part)  # Extrude2 merges LPattern1_18

    add(lpattern1_19.part)  # Extrude2 merges LPattern1_19

    add(lpattern1_20.part)  # Extrude2 merges LPattern1_20

    add(lpattern1_21.part)  # Extrude2 merges LPattern1_21

    add(lpattern1_22.part)  # Extrude2 merges LPattern1_22
    # Sketch218 → Extrude2 (add, two sides: drawn at the far end of the back side and taken through both)
    with BuildSketch(Plane(origin=(584.2, 0, 0), x_dir=(0, 0, -1), z_dir=(1, 0, 0)).offset(-EXTRUDE2_DEPTH_BACK)):
        with Locations((0, 30.9753)):
            Rectangle(SKETCH218_W, SKETCH218_H)
    extrude(amount=EXTRUDE2_DEPTH + EXTRUDE2_DEPTH_BACK)


with BuildPart() as body_5:
    # Sketch219 → Revolve2 (revolve)
    with BuildSketch(Plane(origin=(1193.8, 0, 0), x_dir=(0, 0, -1), z_dir=(1, 0, 0))):
        with BuildLine():
            Line((-0.000306852, 21.487836527), (-0.000306852, 13.550336527))
            ThreePointArc((-0.000306852, 13.550336527), (3.968443148, 17.519086527), (-0.000306852, 21.487836527))
        make_face()
    revolve(axis=Axis((1193.8, 22.284965157, 0.000306852), (0, -1, 0)))


with BuildPart() as lpattern2_1:
    # LPattern2: pattern copy
    add(body_5.part.moved(Location(Vector(-1, 0, 0) * (1 * LPATTERN2_PITCH))))


with BuildPart() as lpattern2_2:
    # LPattern2: pattern copy
    add(body_5.part.moved(Location(Vector(-1, 0, 0) * (2 * LPATTERN2_PITCH))))


with BuildPart() as lpattern2_3:
    # LPattern2: pattern copy
    add(body_5.part.moved(Location(Vector(-1, 0, 0) * (3 * LPATTERN2_PITCH))))


with BuildPart() as lpattern2_4:
    # LPattern2: pattern copy
    add(body_5.part.moved(Location(Vector(-1, 0, 0) * (4 * LPATTERN2_PITCH))))


with BuildPart() as lpattern2_5:
    # LPattern2: pattern copy
    add(body_5.part.moved(Location(Vector(-1, 0, 0) * (5 * LPATTERN2_PITCH))))


with BuildPart() as lpattern2_6:
    # LPattern2: pattern copy
    add(body_5.part.moved(Location(Vector(-1, 0, 0) * (6 * LPATTERN2_PITCH))))


with BuildPart() as lpattern2_7:
    # LPattern2: pattern copy
    add(body_5.part.moved(Location(Vector(-1, 0, 0) * (7 * LPATTERN2_PITCH))))


with BuildPart() as lpattern2_8:
    # LPattern2: pattern copy
    add(body_5.part.moved(Location(Vector(-1, 0, 0) * (8 * LPATTERN2_PITCH))))


with BuildPart() as lpattern2_9:
    # LPattern2: pattern copy
    add(body_5.part.moved(Location(Vector(-1, 0, 0) * (9 * LPATTERN2_PITCH))))


with BuildPart() as lpattern2_10:
    # LPattern2: pattern copy
    add(body_5.part.moved(Location(Vector(-1, 0, 0) * (10 * LPATTERN2_PITCH))))


with BuildPart() as lpattern2_11:
    # LPattern2: pattern copy
    add(body_5.part.moved(Location(Vector(-1, 0, 0) * (11 * LPATTERN2_PITCH))))


with BuildPart() as lpattern2_12:
    # LPattern2: pattern copy
    add(body_5.part.moved(Location(Vector(-1, 0, 0) * (12 * LPATTERN2_PITCH))))


with BuildPart() as lpattern2_13:
    # LPattern2: pattern copy
    add(body_5.part.moved(Location(Vector(-1, 0, 0) * (13 * LPATTERN2_PITCH))))


with BuildPart() as lpattern2_14:
    # LPattern2: pattern copy
    add(body_5.part.moved(Location(Vector(-1, 0, 0) * (14 * LPATTERN2_PITCH))))


with BuildPart() as lpattern2_15:
    # LPattern2: pattern copy
    add(body_5.part.moved(Location(Vector(-1, 0, 0) * (15 * LPATTERN2_PITCH))))


with BuildPart() as lpattern2_16:
    # LPattern2: pattern copy
    add(body_5.part.moved(Location(Vector(-1, 0, 0) * (16 * LPATTERN2_PITCH))))


with BuildPart() as lpattern2_17:
    # LPattern2: pattern copy
    add(body_5.part.moved(Location(Vector(-1, 0, 0) * (17 * LPATTERN2_PITCH))))


with BuildPart() as lpattern2_18:
    # LPattern2: pattern copy
    add(body_5.part.moved(Location(Vector(-1, 0, 0) * (18 * LPATTERN2_PITCH))))


with BuildPart() as lpattern2_19:
    # LPattern2: pattern copy
    add(body_5.part.moved(Location(Vector(-1, 0, 0) * (19 * LPATTERN2_PITCH))))


with BuildPart() as lpattern2_20:
    # LPattern2: pattern copy
    add(body_5.part.moved(Location(Vector(-1, 0, 0) * (20 * LPATTERN2_PITCH))))


with BuildPart() as lpattern2_21:
    # LPattern2: pattern copy
    add(body_5.part.moved(Location(Vector(-1, 0, 0) * (21 * LPATTERN2_PITCH))))


with BuildPart() as lpattern2_22:
    # LPattern2: pattern copy
    add(body_5.part.moved(Location(Vector(-1, 0, 0) * (22 * LPATTERN2_PITCH))))


with BuildPart() as body_5_1:
    add(body_5.part)

    add(lpattern2_1.part)  # Extrude3 merges LPattern2_1

    add(lpattern2_2.part)  # Extrude3 merges LPattern2_2

    add(lpattern2_3.part)  # Extrude3 merges LPattern2_3

    add(lpattern2_4.part)  # Extrude3 merges LPattern2_4

    add(lpattern2_5.part)  # Extrude3 merges LPattern2_5

    add(lpattern2_6.part)  # Extrude3 merges LPattern2_6

    add(lpattern2_7.part)  # Extrude3 merges LPattern2_7

    add(lpattern2_8.part)  # Extrude3 merges LPattern2_8

    add(lpattern2_9.part)  # Extrude3 merges LPattern2_9

    add(lpattern2_10.part)  # Extrude3 merges LPattern2_10

    add(lpattern2_11.part)  # Extrude3 merges LPattern2_11

    add(lpattern2_12.part)  # Extrude3 merges LPattern2_12

    add(lpattern2_13.part)  # Extrude3 merges LPattern2_13

    add(lpattern2_14.part)  # Extrude3 merges LPattern2_14

    add(lpattern2_15.part)  # Extrude3 merges LPattern2_15

    add(lpattern2_16.part)  # Extrude3 merges LPattern2_16

    add(lpattern2_17.part)  # Extrude3 merges LPattern2_17

    add(lpattern2_18.part)  # Extrude3 merges LPattern2_18

    add(lpattern2_19.part)  # Extrude3 merges LPattern2_19

    add(lpattern2_20.part)  # Extrude3 merges LPattern2_20

    add(lpattern2_21.part)  # Extrude3 merges LPattern2_21

    add(lpattern2_22.part)  # Extrude3 merges LPattern2_22
    # Sketch220 → Extrude3 (add, two sides: drawn at the far end of the back side and taken through both)
    with BuildSketch(Plane(origin=(1193.8, 0, 0), x_dir=(0, 0, -1), z_dir=(1, 0, 0)).offset(-EXTRUDE3_DEPTH_BACK)):
        with Locations((-0.000306853, 17.519086527)):
            Rectangle(SKETCH220_W, SKETCH220_H)
    extrude(amount=EXTRUDE3_DEPTH + EXTRUDE3_DEPTH_BACK)


with BuildPart() as body_6:
    # Mirror3: mirrored copy
    add(body_4_1.part.mirror(Plane.ZX))


with BuildPart() as body_7:
    # Mirror3 2: mirrored copy
    add(body_5_1.part.mirror(Plane.ZX))


solid = body_3_1.part
